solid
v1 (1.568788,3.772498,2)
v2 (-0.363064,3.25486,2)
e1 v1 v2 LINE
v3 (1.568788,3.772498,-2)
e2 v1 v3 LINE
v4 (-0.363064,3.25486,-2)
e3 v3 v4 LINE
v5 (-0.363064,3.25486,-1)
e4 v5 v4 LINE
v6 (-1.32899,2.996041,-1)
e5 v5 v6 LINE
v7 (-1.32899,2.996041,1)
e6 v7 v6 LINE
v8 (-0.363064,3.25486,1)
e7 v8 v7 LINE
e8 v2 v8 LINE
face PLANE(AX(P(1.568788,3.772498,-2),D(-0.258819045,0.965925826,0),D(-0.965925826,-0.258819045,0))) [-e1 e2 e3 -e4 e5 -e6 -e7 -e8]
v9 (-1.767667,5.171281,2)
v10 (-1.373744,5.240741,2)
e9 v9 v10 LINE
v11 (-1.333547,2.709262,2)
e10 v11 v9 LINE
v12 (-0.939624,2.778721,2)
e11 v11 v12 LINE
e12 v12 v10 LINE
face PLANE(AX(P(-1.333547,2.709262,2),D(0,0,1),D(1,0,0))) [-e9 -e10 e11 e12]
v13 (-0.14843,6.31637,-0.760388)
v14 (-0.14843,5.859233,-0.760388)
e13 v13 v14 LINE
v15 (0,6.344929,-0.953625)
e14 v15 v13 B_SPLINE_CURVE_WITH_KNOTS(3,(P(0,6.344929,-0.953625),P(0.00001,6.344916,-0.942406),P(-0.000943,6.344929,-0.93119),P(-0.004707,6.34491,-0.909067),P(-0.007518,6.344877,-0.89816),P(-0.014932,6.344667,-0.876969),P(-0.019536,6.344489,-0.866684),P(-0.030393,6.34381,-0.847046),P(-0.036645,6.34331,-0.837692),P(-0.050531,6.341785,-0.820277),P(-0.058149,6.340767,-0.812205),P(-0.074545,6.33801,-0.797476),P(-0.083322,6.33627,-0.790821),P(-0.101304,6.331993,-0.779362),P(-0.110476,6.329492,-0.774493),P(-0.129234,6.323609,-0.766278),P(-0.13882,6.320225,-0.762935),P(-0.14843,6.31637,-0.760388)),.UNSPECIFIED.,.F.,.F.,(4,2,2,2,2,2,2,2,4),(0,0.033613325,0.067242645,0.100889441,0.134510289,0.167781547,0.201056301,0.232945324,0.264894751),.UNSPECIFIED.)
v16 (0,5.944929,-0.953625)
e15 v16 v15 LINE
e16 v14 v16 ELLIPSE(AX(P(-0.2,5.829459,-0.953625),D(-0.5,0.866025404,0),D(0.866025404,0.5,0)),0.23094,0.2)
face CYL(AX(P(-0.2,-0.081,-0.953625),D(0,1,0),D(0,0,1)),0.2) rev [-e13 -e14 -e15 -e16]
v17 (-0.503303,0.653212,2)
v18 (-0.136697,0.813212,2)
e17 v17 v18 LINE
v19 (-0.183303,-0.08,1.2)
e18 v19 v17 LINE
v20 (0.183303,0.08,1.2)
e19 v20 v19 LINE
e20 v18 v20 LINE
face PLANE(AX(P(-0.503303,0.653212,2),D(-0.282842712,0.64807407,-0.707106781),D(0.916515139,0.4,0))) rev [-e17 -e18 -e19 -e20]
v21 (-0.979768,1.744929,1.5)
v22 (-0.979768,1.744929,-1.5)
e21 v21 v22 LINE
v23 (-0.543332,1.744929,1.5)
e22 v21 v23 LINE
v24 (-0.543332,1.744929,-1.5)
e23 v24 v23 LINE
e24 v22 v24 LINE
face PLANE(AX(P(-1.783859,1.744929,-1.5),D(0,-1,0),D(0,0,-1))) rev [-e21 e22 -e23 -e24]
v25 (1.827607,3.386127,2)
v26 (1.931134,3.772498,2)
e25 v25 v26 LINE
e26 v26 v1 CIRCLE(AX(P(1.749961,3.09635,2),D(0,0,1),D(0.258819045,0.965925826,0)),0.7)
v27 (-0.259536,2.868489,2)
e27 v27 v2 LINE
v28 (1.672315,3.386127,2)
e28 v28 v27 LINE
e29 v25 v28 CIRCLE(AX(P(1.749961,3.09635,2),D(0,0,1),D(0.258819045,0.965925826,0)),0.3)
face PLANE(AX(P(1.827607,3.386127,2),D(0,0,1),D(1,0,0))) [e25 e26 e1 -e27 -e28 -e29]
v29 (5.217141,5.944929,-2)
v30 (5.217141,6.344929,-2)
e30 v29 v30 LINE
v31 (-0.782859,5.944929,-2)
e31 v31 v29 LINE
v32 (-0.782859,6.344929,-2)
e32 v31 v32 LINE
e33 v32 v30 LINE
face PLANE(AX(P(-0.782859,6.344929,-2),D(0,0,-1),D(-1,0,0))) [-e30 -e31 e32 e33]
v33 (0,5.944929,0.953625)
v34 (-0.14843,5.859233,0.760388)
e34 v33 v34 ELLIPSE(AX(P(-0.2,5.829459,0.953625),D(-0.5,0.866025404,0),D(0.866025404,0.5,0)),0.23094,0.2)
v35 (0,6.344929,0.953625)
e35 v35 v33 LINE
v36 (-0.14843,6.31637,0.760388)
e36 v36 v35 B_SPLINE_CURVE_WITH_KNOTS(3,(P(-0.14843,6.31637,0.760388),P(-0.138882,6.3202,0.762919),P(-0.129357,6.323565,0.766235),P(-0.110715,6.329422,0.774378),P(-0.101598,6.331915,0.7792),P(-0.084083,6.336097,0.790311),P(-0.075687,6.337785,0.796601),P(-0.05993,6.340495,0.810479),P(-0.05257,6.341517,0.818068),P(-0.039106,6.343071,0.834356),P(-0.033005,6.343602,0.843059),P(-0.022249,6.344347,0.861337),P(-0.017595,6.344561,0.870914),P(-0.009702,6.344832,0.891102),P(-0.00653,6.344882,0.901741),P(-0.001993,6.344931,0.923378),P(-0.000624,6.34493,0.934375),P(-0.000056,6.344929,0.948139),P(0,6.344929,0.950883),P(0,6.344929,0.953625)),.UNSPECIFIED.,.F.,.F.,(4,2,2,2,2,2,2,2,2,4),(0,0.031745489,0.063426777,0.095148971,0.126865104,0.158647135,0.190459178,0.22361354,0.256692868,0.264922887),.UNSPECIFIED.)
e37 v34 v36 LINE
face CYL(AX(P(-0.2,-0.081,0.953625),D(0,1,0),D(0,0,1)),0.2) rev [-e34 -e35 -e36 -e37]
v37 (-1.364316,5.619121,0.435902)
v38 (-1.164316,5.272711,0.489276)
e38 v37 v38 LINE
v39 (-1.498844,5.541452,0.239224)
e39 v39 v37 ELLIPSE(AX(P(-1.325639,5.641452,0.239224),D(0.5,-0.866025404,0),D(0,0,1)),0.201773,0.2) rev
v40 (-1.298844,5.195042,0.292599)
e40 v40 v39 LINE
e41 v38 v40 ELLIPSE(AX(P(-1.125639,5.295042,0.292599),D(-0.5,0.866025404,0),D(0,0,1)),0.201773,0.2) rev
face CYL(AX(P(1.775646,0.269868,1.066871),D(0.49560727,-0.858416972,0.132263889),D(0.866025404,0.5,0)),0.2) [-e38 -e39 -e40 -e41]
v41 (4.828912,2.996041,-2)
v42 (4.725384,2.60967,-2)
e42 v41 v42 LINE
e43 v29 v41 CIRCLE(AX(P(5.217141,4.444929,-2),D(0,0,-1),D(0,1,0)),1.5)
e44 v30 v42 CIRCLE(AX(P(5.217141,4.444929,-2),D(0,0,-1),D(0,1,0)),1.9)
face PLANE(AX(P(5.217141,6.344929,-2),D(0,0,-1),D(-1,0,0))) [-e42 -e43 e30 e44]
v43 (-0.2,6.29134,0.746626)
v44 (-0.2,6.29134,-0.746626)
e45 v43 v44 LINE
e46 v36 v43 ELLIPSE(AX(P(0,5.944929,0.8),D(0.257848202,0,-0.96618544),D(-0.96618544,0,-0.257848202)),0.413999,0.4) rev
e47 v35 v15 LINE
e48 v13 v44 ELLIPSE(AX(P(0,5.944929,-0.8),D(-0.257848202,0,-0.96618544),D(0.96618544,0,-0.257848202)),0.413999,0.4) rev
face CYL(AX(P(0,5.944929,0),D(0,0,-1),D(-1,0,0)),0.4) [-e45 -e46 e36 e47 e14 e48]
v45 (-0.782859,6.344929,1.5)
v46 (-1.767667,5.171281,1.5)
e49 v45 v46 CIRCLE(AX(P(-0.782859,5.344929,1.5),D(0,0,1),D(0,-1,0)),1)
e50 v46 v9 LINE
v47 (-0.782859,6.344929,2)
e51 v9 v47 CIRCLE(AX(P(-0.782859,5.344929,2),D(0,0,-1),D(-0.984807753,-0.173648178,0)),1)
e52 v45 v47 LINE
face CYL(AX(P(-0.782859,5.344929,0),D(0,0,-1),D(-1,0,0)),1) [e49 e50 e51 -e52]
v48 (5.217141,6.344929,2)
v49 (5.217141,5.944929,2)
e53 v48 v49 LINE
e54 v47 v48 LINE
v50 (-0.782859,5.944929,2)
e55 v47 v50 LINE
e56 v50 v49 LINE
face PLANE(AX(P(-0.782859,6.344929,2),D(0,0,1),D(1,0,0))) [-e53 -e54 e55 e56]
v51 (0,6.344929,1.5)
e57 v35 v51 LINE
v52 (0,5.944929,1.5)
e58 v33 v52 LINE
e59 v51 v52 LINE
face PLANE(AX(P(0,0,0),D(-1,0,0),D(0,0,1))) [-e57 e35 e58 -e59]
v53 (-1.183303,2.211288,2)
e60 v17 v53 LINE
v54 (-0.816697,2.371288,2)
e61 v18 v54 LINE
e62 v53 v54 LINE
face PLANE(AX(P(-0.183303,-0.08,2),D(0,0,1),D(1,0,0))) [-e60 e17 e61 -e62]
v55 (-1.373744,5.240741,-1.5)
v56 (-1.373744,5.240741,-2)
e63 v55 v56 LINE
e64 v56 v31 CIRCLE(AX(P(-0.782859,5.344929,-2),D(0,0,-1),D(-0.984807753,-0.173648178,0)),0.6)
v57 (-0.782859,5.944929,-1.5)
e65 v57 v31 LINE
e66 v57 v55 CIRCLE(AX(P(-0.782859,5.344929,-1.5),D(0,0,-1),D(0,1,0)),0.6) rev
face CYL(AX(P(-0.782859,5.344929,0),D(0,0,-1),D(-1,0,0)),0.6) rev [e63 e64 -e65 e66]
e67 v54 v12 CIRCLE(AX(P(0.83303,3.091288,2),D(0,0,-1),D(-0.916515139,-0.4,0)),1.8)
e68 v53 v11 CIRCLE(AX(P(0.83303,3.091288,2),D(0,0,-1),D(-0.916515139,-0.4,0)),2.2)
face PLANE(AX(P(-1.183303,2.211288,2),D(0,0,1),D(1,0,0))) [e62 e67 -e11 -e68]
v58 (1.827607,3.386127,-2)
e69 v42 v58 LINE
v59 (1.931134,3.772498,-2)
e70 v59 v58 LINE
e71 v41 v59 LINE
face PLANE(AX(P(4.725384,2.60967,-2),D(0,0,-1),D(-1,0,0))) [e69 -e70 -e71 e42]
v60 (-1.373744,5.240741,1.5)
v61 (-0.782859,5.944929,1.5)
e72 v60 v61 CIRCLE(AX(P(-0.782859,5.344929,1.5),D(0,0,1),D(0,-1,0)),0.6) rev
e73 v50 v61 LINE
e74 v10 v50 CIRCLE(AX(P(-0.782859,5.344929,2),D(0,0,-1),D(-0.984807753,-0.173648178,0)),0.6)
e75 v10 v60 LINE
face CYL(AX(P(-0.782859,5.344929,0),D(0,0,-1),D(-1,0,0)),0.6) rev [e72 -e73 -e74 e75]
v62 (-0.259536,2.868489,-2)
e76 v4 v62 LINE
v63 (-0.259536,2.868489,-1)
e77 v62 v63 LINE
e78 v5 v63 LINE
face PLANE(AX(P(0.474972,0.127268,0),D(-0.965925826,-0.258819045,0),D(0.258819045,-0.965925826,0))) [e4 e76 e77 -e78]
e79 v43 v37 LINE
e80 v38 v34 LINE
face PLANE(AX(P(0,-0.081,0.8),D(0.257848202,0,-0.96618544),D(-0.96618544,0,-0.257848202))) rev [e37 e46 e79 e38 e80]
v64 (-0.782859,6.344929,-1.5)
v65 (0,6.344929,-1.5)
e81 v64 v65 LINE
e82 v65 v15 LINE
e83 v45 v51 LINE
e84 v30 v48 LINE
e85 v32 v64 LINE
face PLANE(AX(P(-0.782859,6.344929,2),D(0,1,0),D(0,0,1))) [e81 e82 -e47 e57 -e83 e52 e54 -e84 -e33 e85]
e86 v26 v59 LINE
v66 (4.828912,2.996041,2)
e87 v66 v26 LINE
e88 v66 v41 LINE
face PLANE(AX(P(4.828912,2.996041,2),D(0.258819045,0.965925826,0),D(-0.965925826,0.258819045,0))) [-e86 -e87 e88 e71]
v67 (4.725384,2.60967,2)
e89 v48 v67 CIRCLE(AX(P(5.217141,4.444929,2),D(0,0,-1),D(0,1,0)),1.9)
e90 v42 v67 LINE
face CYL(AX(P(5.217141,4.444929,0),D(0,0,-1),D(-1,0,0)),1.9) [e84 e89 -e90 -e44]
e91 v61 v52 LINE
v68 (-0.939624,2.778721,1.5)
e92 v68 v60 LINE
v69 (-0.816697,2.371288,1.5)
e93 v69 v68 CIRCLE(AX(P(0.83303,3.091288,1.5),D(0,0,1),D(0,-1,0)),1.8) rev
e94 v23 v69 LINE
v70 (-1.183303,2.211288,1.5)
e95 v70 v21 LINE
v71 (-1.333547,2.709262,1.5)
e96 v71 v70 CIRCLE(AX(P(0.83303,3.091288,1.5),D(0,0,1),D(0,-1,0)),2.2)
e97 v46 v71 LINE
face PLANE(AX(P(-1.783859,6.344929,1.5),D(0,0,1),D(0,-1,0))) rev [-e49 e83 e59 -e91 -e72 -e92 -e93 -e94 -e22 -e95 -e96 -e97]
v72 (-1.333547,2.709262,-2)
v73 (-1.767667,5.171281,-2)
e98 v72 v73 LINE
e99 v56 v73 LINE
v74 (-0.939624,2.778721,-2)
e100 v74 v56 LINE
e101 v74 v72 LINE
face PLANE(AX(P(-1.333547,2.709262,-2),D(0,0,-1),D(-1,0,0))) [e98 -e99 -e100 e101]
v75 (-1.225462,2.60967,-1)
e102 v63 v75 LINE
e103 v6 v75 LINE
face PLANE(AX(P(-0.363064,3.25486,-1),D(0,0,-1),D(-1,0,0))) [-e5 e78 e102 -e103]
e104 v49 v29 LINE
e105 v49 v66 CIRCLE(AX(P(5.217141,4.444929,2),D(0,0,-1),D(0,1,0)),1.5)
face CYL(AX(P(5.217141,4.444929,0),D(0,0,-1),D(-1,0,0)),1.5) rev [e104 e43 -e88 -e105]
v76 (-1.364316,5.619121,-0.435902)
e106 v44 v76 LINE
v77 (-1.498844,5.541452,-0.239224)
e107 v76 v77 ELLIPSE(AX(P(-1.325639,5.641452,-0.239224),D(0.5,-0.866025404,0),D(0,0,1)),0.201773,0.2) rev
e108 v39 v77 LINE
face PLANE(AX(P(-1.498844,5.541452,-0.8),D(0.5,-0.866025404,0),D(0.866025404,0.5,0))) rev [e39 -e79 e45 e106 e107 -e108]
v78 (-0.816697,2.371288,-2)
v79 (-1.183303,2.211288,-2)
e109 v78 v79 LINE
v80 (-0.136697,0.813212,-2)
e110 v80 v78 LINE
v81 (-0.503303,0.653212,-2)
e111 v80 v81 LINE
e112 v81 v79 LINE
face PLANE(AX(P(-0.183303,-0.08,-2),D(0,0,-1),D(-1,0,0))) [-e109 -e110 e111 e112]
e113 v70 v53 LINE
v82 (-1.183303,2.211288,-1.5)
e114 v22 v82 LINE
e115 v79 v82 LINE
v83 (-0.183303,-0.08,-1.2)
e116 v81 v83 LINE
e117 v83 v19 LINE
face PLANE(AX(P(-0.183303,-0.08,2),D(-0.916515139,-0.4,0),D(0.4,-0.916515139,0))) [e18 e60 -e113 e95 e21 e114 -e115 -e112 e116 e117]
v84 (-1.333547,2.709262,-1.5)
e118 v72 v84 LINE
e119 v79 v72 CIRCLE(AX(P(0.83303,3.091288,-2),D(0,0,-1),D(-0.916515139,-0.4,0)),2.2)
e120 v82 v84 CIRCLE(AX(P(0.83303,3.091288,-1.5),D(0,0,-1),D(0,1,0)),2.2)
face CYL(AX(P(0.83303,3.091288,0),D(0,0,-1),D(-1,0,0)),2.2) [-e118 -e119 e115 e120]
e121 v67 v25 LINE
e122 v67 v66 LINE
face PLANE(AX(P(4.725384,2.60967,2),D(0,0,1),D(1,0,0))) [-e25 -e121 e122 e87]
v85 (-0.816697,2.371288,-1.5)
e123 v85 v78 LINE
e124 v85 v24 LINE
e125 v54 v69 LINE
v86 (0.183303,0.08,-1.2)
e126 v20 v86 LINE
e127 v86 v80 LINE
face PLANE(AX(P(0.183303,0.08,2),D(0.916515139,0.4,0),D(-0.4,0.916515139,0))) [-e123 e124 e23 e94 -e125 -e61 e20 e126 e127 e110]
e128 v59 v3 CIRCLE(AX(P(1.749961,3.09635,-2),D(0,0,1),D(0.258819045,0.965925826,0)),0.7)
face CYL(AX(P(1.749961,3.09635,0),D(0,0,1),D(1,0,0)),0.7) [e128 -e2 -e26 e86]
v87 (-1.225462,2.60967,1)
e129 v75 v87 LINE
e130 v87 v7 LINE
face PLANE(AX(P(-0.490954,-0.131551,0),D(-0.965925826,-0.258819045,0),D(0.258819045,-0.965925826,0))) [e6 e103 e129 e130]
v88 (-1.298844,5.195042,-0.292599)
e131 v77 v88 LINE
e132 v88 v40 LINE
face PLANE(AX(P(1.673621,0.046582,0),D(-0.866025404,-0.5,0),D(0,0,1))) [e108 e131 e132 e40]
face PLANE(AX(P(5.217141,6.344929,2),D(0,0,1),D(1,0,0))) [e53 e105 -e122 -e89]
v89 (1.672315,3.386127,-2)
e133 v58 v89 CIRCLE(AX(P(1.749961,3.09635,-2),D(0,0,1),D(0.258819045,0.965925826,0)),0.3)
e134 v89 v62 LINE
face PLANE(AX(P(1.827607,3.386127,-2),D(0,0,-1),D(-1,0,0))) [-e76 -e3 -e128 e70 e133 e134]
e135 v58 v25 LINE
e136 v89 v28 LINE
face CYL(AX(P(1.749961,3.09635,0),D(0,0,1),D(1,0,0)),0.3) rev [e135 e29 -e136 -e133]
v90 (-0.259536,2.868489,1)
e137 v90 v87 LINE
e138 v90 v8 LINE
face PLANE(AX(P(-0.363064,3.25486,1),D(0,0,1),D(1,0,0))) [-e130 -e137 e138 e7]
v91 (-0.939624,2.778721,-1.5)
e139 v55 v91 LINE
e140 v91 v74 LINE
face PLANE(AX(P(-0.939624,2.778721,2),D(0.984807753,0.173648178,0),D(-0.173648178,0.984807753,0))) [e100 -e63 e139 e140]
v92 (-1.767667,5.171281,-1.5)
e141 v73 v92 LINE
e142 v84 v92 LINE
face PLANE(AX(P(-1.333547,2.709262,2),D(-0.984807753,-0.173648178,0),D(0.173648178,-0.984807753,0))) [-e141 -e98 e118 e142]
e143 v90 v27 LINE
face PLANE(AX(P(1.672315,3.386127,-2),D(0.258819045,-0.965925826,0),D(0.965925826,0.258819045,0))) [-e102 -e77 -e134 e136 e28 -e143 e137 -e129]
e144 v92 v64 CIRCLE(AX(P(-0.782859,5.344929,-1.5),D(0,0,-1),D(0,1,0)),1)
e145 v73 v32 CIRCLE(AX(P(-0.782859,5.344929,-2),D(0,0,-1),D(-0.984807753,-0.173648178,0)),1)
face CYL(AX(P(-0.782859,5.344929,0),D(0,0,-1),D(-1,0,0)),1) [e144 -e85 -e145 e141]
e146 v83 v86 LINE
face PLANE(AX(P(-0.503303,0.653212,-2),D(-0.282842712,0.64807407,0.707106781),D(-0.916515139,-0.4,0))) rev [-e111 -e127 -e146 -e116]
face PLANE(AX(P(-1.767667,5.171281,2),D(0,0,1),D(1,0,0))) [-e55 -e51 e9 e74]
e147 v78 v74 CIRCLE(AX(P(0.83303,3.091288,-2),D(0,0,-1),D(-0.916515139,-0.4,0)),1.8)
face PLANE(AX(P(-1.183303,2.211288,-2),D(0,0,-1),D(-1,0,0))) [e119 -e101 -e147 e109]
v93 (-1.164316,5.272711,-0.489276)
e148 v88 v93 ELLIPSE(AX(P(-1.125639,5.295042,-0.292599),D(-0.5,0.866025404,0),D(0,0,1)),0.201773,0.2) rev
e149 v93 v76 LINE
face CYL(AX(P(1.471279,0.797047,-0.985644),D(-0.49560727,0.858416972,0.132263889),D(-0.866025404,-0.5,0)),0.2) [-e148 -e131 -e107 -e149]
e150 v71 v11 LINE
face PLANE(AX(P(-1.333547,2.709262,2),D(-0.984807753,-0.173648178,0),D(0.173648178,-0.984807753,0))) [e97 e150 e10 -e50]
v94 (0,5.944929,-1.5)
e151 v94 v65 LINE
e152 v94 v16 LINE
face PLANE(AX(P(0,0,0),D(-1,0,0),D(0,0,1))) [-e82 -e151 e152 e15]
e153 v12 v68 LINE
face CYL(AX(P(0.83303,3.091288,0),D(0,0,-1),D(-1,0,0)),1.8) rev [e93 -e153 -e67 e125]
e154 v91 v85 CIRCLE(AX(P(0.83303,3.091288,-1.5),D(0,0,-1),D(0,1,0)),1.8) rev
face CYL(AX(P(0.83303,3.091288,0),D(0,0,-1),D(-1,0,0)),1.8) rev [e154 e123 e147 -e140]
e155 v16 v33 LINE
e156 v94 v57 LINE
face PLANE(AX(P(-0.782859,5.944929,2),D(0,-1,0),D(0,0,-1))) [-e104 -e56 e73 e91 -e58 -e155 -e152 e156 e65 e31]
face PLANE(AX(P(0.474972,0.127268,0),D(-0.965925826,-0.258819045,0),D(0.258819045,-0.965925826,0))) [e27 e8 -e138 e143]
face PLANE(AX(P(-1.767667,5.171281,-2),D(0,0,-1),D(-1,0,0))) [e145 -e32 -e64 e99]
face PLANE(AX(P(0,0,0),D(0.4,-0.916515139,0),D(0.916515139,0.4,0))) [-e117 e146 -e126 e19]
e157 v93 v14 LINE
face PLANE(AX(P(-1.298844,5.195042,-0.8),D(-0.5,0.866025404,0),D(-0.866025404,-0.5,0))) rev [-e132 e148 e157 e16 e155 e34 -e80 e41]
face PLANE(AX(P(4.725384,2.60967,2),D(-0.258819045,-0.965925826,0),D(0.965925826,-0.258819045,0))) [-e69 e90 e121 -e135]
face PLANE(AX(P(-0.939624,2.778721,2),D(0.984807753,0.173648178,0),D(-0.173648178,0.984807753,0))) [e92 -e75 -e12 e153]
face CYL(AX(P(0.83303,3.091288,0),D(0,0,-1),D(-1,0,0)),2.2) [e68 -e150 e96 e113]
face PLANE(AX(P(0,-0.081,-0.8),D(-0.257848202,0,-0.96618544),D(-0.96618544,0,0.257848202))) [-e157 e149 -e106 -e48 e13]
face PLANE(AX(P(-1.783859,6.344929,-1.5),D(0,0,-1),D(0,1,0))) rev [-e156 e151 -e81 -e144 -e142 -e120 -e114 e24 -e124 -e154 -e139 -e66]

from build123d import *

# Parameters (mm, degrees)
MAINPROFILES_W         = 0.4
MAINPROFILES_H         = 4
CONNECTIONACCESS_REACH = 11.742
CONNECTIONACCESSS_W    = 3
CONNECTIONACCESSS_H    = 4.6
ENDPROFILES_W          = 4
ENDPROFILES_H          = 0.4
ENDCONNECTIONS_W       = 2
ENDCONNECTIONS_H       = 0.4
LOCKINGTABS_W          = 1.6
LOCKINGTABS_H          = 0.4
LTCUT_REACH            = 10.24
LTCUTF_R               = 0.2
MPC_SIZE               = 0.8


with BuildPart() as part:
    # MainProfile: sweep along a path in MainProfilePath
    with BuildLine(Plane.XY) as mainprofile_path:
        Line((0, 0), (-1, 2.291287847))
        ThreePointArc((-1, 2.291287847), (-1.081718762, 2.513588866), (-1.136585228, 2.743991492))
        Line((-1.136585228, 2.743991492), (-1.570705672, 5.206010875))
        ThreePointArc((-1.570705672, 5.206010875), (-1.395695024, 5.859159505), (-0.78285947, 6.144929417))
        Line((-0.78285947, 6.144929417), (5.21714053, 6.144929417))
        ThreePointArc((5.21714053, 6.144929417), (6.902596795, 4.22303489), (4.777148154, 2.802855512))
        Line((4.777148154, 2.802855512), (1.879370675, 3.579312647))
        ThreePointArc((1.879370675, 3.579312647), (1.749961152, 3.596349734), (1.62055163, 3.579312647))
    # MainProfileS → MainProfile (sweep)
    with BuildSketch(Plane(origin=(0, 0, 0), x_dir=(0.9165151389911679, 0.4000000000000004, 0), z_dir=(-0.4000000000000004, 0.9165151389911679, 0))):
        Rectangle(MAINPROFILES_W, MAINPROFILES_H)
    sweep(path=mainprofile_path.line)

    # ConnectionAccessS → ConnectionAccess (cut, up to next)
    with BuildSketch(Plane(origin=(0, 0, 0), x_dir=(0, 0, -1), z_dir=(1, 0, 0)), mode=Mode.PRIVATE) as connectionaccess_sk1:
        with Locations((0, 4.044929417)):
            Rectangle(CONNECTIONACCESSS_W, CONNECTIONACCESSS_H)
    connectionaccess_tool1 = extrude(connectionaccess_sk1.sketch, amount=-CONNECTIONACCESS_REACH, mode=Mode.PRIVATE) & part.part
    add(connectionaccess_tool1.solids().sort_by_distance((0, 4.044929, 0))[0], mode=Mode.SUBTRACT)

    # EndProfile: sweep along a path in EndProfilePath
    with BuildLine(Plane.XY) as endprofile_path:
        Line((1.62055163, 3.579312647), (-0.311300023, 3.061674557))
    # EndProfileS → EndProfile (sweep)
    with BuildSketch(Plane(origin=(2.406823416, 0.644906391, 0), x_dir=(0, 0, 1), z_dir=(-0.9659258262890702, -0.2588190451025136, 0))):
        with Locations((0, 3.037920901)):
            Rectangle(ENDPROFILES_W, ENDPROFILES_H)
    sweep(path=endprofile_path.line)

    # EndConnection: sweep along a path in EndConnectionPath
    with BuildLine(Plane.XY) as endconnection_path:
        Line((-0.311300023, 3.061674557), (-1.277225849, 2.802855512))
    # EndConnectionS → EndConnection (sweep)
    with BuildSketch(Plane(origin=(0.474971764, 0.127268301, 0), x_dir=(0, 0, 1), z_dir=(-0.9659258262890702, -0.2588190451025135, 0))):
        with Locations((0, 3.037920901)):
            Rectangle(ENDCONNECTIONS_W, ENDCONNECTIONS_H)
    sweep(path=endconnection_path.line)

    # LockingTab: sweep along a path in LockingTabPath
    with BuildLine(Plane.XY) as lockingtab_path:
        Line((-1.398843786, 5.368246688), (-0.1, 6.118134498))
        ThreePointArc((-0.1, 6.118134498), (-0.051763809, 6.138114582), (0, 6.144929417))
    # LockingTabS → LockingTab (sweep)
    with BuildSketch(Plane.ZY):
        with Locations((0, 6.144929417)):
            Rectangle(LOCKINGTABS_W, LOCKINGTABS_H)
    sweep(path=lockingtab_path.line)

    # LTCutS → LTCut (cut, up to next)
    with BuildSketch(Plane(origin=(2.972464708, 6.344929417, 0), x_dir=(-1, 0, 0), z_dir=(0, -1, 0)), mode=Mode.PRIVATE) as ltcut_sk1:
        Polygon((2.972464708, 0.8), (4.471308495, 0.4), (4.471308495, 0.8), align=None)
    ltcut_tool1 = extrude(ltcut_sk1.sketch, amount=LTCUT_REACH, mode=Mode.PRIVATE) & part.part
    ltcut = ltcut_tool1.solids().sort_by_distance((-0.999229, 6.344929, -0.666667))[0]
    add(ltcut, mode=Mode.SUBTRACT)

    # LTCutHM: LTCut across plane
    add(ltcut.mirror(Plane.XY), mode=Mode.SUBTRACT)

    # LTCutF
    # the kernel refuses this fillet: 0.2 mm, written as the material it adds along each edge
    with BuildSketch(Plane(origin=(0, 5.560866603, 0.8), x_dir=(0, 0, 1), z_dir=(0, 1, 0))) as ltcutf_piece_1_section:
        with BuildLine():
            CenterArc((LTCUTF_R * 0.768125627693, -LTCUTF_R), LTCUTF_R, 90, 75.05757969)
            Line((-LTCUTF_R * 0.198059812329, -LTCUTF_R * 0.742151797585), (0, 0))
            Line((0, 0), (LTCUTF_R * 0.768125627693, 0))
        make_face()
    ltcutf_piece_1 = extrude(amount=1.168125628, mode=Mode.PRIVATE)
    ltcutf_piece_1 = split(ltcutf_piece_1, bisect_by=Plane(origin=(-0.048441187, 5.916961885, 0.804118212), z_dir=(-0.4999999999999946, 0.8660254037844418, 0)), keep=Keep.TOP, mode=Mode.PRIVATE)
    ltcutf_piece_1 = ltcutf_piece_1 & Plane(origin=(0, 5.944929417, 0.804118212), x_dir=(-0.5000000000000254, 0.8660254037844239, 0), z_dir=(0, 0, -1)) * Cylinder(0.4, 3, mode=Mode.PRIVATE)
    add(ltcutf_piece_1)
    with BuildSketch(Plane(origin=(0, 6.728992231, -0.8), x_dir=(0, 0, -1), z_dir=(0, -1, 0))) as ltcutf_piece_2_section:
        with BuildLine():
            CenterArc((LTCUTF_R * 0.768125627693, -LTCUTF_R), LTCUTF_R, 90, 75.05757969)
            Line((-LTCUTF_R * 0.198059812329, -LTCUTF_R * 0.742151797585), (0, 0))
            Line((0, 0), (LTCUTF_R * 0.768125627693, 0))
        make_face()
    ltcutf_piece_2 = extrude(amount=1.168125628, mode=Mode.PRIVATE)
    ltcutf_piece_2 = split(ltcutf_piece_2, bisect_by=Plane(origin=(0.062272653, 5.98088255, -0.82477541), z_dir=(-0.4999999999999946, 0.8660254037844418, 0)), keep=Keep.TOP, mode=Mode.PRIVATE)
    ltcutf_piece_2 = ltcutf_piece_2 & Plane(origin=(0, 5.944929417, -0.82477541), x_dir=(-0.5000000000000254, 0.8660254037844239, 0), z_dir=(0, 0, -1)) * Cylinder(0.4, 3, mode=Mode.PRIVATE)
    add(ltcutf_piece_2)
    # the kernel refuses this fillet: 0.2 mm, written as the material it takes off along each edge
    with BuildSketch(Plane(origin=(-1.101389565, 4.853040863, 0.506069552), x_dir=(0.8293899797947963, 0.5129525340785382, 0.22134127314713234), z_dir=(-0.49560726984934556, 0.8584169719794723, -0.13226388883618956)), Plane(origin=(-1.101389565, 4.853040863, -0.506069552), x_dir=(0.06613194441810266, -0.11454388773545661, 0.9912145396986104), z_dir=(-0.49560726984934556, 0.8584169719794723, 0.13226388883618956))) as ltcutf_2_piece_1:
        with BuildLine():
            CenterArc((LTCUTF_R * 0.796817292686, LTCUTF_R), LTCUTF_R, 192.903114006, 77.096885994)
            Line((-LTCUTF_R * 0.1779317665, LTCUTF_R * 0.776696906389), (0, 0))
            Line((0, 0), (LTCUTF_R * 0.796817292686, 0))
        make_face()
    extrude(amount=1.200362624, mode=Mode.SUBTRACT)

    # MPC
    mpc_edges = [part.edges().sort_by_distance(p)[0] for p in [
        (0, 0, -2),
        (0, 0, 2),
    ]]
    chamfer(mpc_edges, length=MPC_SIZE)


solid = part.part
